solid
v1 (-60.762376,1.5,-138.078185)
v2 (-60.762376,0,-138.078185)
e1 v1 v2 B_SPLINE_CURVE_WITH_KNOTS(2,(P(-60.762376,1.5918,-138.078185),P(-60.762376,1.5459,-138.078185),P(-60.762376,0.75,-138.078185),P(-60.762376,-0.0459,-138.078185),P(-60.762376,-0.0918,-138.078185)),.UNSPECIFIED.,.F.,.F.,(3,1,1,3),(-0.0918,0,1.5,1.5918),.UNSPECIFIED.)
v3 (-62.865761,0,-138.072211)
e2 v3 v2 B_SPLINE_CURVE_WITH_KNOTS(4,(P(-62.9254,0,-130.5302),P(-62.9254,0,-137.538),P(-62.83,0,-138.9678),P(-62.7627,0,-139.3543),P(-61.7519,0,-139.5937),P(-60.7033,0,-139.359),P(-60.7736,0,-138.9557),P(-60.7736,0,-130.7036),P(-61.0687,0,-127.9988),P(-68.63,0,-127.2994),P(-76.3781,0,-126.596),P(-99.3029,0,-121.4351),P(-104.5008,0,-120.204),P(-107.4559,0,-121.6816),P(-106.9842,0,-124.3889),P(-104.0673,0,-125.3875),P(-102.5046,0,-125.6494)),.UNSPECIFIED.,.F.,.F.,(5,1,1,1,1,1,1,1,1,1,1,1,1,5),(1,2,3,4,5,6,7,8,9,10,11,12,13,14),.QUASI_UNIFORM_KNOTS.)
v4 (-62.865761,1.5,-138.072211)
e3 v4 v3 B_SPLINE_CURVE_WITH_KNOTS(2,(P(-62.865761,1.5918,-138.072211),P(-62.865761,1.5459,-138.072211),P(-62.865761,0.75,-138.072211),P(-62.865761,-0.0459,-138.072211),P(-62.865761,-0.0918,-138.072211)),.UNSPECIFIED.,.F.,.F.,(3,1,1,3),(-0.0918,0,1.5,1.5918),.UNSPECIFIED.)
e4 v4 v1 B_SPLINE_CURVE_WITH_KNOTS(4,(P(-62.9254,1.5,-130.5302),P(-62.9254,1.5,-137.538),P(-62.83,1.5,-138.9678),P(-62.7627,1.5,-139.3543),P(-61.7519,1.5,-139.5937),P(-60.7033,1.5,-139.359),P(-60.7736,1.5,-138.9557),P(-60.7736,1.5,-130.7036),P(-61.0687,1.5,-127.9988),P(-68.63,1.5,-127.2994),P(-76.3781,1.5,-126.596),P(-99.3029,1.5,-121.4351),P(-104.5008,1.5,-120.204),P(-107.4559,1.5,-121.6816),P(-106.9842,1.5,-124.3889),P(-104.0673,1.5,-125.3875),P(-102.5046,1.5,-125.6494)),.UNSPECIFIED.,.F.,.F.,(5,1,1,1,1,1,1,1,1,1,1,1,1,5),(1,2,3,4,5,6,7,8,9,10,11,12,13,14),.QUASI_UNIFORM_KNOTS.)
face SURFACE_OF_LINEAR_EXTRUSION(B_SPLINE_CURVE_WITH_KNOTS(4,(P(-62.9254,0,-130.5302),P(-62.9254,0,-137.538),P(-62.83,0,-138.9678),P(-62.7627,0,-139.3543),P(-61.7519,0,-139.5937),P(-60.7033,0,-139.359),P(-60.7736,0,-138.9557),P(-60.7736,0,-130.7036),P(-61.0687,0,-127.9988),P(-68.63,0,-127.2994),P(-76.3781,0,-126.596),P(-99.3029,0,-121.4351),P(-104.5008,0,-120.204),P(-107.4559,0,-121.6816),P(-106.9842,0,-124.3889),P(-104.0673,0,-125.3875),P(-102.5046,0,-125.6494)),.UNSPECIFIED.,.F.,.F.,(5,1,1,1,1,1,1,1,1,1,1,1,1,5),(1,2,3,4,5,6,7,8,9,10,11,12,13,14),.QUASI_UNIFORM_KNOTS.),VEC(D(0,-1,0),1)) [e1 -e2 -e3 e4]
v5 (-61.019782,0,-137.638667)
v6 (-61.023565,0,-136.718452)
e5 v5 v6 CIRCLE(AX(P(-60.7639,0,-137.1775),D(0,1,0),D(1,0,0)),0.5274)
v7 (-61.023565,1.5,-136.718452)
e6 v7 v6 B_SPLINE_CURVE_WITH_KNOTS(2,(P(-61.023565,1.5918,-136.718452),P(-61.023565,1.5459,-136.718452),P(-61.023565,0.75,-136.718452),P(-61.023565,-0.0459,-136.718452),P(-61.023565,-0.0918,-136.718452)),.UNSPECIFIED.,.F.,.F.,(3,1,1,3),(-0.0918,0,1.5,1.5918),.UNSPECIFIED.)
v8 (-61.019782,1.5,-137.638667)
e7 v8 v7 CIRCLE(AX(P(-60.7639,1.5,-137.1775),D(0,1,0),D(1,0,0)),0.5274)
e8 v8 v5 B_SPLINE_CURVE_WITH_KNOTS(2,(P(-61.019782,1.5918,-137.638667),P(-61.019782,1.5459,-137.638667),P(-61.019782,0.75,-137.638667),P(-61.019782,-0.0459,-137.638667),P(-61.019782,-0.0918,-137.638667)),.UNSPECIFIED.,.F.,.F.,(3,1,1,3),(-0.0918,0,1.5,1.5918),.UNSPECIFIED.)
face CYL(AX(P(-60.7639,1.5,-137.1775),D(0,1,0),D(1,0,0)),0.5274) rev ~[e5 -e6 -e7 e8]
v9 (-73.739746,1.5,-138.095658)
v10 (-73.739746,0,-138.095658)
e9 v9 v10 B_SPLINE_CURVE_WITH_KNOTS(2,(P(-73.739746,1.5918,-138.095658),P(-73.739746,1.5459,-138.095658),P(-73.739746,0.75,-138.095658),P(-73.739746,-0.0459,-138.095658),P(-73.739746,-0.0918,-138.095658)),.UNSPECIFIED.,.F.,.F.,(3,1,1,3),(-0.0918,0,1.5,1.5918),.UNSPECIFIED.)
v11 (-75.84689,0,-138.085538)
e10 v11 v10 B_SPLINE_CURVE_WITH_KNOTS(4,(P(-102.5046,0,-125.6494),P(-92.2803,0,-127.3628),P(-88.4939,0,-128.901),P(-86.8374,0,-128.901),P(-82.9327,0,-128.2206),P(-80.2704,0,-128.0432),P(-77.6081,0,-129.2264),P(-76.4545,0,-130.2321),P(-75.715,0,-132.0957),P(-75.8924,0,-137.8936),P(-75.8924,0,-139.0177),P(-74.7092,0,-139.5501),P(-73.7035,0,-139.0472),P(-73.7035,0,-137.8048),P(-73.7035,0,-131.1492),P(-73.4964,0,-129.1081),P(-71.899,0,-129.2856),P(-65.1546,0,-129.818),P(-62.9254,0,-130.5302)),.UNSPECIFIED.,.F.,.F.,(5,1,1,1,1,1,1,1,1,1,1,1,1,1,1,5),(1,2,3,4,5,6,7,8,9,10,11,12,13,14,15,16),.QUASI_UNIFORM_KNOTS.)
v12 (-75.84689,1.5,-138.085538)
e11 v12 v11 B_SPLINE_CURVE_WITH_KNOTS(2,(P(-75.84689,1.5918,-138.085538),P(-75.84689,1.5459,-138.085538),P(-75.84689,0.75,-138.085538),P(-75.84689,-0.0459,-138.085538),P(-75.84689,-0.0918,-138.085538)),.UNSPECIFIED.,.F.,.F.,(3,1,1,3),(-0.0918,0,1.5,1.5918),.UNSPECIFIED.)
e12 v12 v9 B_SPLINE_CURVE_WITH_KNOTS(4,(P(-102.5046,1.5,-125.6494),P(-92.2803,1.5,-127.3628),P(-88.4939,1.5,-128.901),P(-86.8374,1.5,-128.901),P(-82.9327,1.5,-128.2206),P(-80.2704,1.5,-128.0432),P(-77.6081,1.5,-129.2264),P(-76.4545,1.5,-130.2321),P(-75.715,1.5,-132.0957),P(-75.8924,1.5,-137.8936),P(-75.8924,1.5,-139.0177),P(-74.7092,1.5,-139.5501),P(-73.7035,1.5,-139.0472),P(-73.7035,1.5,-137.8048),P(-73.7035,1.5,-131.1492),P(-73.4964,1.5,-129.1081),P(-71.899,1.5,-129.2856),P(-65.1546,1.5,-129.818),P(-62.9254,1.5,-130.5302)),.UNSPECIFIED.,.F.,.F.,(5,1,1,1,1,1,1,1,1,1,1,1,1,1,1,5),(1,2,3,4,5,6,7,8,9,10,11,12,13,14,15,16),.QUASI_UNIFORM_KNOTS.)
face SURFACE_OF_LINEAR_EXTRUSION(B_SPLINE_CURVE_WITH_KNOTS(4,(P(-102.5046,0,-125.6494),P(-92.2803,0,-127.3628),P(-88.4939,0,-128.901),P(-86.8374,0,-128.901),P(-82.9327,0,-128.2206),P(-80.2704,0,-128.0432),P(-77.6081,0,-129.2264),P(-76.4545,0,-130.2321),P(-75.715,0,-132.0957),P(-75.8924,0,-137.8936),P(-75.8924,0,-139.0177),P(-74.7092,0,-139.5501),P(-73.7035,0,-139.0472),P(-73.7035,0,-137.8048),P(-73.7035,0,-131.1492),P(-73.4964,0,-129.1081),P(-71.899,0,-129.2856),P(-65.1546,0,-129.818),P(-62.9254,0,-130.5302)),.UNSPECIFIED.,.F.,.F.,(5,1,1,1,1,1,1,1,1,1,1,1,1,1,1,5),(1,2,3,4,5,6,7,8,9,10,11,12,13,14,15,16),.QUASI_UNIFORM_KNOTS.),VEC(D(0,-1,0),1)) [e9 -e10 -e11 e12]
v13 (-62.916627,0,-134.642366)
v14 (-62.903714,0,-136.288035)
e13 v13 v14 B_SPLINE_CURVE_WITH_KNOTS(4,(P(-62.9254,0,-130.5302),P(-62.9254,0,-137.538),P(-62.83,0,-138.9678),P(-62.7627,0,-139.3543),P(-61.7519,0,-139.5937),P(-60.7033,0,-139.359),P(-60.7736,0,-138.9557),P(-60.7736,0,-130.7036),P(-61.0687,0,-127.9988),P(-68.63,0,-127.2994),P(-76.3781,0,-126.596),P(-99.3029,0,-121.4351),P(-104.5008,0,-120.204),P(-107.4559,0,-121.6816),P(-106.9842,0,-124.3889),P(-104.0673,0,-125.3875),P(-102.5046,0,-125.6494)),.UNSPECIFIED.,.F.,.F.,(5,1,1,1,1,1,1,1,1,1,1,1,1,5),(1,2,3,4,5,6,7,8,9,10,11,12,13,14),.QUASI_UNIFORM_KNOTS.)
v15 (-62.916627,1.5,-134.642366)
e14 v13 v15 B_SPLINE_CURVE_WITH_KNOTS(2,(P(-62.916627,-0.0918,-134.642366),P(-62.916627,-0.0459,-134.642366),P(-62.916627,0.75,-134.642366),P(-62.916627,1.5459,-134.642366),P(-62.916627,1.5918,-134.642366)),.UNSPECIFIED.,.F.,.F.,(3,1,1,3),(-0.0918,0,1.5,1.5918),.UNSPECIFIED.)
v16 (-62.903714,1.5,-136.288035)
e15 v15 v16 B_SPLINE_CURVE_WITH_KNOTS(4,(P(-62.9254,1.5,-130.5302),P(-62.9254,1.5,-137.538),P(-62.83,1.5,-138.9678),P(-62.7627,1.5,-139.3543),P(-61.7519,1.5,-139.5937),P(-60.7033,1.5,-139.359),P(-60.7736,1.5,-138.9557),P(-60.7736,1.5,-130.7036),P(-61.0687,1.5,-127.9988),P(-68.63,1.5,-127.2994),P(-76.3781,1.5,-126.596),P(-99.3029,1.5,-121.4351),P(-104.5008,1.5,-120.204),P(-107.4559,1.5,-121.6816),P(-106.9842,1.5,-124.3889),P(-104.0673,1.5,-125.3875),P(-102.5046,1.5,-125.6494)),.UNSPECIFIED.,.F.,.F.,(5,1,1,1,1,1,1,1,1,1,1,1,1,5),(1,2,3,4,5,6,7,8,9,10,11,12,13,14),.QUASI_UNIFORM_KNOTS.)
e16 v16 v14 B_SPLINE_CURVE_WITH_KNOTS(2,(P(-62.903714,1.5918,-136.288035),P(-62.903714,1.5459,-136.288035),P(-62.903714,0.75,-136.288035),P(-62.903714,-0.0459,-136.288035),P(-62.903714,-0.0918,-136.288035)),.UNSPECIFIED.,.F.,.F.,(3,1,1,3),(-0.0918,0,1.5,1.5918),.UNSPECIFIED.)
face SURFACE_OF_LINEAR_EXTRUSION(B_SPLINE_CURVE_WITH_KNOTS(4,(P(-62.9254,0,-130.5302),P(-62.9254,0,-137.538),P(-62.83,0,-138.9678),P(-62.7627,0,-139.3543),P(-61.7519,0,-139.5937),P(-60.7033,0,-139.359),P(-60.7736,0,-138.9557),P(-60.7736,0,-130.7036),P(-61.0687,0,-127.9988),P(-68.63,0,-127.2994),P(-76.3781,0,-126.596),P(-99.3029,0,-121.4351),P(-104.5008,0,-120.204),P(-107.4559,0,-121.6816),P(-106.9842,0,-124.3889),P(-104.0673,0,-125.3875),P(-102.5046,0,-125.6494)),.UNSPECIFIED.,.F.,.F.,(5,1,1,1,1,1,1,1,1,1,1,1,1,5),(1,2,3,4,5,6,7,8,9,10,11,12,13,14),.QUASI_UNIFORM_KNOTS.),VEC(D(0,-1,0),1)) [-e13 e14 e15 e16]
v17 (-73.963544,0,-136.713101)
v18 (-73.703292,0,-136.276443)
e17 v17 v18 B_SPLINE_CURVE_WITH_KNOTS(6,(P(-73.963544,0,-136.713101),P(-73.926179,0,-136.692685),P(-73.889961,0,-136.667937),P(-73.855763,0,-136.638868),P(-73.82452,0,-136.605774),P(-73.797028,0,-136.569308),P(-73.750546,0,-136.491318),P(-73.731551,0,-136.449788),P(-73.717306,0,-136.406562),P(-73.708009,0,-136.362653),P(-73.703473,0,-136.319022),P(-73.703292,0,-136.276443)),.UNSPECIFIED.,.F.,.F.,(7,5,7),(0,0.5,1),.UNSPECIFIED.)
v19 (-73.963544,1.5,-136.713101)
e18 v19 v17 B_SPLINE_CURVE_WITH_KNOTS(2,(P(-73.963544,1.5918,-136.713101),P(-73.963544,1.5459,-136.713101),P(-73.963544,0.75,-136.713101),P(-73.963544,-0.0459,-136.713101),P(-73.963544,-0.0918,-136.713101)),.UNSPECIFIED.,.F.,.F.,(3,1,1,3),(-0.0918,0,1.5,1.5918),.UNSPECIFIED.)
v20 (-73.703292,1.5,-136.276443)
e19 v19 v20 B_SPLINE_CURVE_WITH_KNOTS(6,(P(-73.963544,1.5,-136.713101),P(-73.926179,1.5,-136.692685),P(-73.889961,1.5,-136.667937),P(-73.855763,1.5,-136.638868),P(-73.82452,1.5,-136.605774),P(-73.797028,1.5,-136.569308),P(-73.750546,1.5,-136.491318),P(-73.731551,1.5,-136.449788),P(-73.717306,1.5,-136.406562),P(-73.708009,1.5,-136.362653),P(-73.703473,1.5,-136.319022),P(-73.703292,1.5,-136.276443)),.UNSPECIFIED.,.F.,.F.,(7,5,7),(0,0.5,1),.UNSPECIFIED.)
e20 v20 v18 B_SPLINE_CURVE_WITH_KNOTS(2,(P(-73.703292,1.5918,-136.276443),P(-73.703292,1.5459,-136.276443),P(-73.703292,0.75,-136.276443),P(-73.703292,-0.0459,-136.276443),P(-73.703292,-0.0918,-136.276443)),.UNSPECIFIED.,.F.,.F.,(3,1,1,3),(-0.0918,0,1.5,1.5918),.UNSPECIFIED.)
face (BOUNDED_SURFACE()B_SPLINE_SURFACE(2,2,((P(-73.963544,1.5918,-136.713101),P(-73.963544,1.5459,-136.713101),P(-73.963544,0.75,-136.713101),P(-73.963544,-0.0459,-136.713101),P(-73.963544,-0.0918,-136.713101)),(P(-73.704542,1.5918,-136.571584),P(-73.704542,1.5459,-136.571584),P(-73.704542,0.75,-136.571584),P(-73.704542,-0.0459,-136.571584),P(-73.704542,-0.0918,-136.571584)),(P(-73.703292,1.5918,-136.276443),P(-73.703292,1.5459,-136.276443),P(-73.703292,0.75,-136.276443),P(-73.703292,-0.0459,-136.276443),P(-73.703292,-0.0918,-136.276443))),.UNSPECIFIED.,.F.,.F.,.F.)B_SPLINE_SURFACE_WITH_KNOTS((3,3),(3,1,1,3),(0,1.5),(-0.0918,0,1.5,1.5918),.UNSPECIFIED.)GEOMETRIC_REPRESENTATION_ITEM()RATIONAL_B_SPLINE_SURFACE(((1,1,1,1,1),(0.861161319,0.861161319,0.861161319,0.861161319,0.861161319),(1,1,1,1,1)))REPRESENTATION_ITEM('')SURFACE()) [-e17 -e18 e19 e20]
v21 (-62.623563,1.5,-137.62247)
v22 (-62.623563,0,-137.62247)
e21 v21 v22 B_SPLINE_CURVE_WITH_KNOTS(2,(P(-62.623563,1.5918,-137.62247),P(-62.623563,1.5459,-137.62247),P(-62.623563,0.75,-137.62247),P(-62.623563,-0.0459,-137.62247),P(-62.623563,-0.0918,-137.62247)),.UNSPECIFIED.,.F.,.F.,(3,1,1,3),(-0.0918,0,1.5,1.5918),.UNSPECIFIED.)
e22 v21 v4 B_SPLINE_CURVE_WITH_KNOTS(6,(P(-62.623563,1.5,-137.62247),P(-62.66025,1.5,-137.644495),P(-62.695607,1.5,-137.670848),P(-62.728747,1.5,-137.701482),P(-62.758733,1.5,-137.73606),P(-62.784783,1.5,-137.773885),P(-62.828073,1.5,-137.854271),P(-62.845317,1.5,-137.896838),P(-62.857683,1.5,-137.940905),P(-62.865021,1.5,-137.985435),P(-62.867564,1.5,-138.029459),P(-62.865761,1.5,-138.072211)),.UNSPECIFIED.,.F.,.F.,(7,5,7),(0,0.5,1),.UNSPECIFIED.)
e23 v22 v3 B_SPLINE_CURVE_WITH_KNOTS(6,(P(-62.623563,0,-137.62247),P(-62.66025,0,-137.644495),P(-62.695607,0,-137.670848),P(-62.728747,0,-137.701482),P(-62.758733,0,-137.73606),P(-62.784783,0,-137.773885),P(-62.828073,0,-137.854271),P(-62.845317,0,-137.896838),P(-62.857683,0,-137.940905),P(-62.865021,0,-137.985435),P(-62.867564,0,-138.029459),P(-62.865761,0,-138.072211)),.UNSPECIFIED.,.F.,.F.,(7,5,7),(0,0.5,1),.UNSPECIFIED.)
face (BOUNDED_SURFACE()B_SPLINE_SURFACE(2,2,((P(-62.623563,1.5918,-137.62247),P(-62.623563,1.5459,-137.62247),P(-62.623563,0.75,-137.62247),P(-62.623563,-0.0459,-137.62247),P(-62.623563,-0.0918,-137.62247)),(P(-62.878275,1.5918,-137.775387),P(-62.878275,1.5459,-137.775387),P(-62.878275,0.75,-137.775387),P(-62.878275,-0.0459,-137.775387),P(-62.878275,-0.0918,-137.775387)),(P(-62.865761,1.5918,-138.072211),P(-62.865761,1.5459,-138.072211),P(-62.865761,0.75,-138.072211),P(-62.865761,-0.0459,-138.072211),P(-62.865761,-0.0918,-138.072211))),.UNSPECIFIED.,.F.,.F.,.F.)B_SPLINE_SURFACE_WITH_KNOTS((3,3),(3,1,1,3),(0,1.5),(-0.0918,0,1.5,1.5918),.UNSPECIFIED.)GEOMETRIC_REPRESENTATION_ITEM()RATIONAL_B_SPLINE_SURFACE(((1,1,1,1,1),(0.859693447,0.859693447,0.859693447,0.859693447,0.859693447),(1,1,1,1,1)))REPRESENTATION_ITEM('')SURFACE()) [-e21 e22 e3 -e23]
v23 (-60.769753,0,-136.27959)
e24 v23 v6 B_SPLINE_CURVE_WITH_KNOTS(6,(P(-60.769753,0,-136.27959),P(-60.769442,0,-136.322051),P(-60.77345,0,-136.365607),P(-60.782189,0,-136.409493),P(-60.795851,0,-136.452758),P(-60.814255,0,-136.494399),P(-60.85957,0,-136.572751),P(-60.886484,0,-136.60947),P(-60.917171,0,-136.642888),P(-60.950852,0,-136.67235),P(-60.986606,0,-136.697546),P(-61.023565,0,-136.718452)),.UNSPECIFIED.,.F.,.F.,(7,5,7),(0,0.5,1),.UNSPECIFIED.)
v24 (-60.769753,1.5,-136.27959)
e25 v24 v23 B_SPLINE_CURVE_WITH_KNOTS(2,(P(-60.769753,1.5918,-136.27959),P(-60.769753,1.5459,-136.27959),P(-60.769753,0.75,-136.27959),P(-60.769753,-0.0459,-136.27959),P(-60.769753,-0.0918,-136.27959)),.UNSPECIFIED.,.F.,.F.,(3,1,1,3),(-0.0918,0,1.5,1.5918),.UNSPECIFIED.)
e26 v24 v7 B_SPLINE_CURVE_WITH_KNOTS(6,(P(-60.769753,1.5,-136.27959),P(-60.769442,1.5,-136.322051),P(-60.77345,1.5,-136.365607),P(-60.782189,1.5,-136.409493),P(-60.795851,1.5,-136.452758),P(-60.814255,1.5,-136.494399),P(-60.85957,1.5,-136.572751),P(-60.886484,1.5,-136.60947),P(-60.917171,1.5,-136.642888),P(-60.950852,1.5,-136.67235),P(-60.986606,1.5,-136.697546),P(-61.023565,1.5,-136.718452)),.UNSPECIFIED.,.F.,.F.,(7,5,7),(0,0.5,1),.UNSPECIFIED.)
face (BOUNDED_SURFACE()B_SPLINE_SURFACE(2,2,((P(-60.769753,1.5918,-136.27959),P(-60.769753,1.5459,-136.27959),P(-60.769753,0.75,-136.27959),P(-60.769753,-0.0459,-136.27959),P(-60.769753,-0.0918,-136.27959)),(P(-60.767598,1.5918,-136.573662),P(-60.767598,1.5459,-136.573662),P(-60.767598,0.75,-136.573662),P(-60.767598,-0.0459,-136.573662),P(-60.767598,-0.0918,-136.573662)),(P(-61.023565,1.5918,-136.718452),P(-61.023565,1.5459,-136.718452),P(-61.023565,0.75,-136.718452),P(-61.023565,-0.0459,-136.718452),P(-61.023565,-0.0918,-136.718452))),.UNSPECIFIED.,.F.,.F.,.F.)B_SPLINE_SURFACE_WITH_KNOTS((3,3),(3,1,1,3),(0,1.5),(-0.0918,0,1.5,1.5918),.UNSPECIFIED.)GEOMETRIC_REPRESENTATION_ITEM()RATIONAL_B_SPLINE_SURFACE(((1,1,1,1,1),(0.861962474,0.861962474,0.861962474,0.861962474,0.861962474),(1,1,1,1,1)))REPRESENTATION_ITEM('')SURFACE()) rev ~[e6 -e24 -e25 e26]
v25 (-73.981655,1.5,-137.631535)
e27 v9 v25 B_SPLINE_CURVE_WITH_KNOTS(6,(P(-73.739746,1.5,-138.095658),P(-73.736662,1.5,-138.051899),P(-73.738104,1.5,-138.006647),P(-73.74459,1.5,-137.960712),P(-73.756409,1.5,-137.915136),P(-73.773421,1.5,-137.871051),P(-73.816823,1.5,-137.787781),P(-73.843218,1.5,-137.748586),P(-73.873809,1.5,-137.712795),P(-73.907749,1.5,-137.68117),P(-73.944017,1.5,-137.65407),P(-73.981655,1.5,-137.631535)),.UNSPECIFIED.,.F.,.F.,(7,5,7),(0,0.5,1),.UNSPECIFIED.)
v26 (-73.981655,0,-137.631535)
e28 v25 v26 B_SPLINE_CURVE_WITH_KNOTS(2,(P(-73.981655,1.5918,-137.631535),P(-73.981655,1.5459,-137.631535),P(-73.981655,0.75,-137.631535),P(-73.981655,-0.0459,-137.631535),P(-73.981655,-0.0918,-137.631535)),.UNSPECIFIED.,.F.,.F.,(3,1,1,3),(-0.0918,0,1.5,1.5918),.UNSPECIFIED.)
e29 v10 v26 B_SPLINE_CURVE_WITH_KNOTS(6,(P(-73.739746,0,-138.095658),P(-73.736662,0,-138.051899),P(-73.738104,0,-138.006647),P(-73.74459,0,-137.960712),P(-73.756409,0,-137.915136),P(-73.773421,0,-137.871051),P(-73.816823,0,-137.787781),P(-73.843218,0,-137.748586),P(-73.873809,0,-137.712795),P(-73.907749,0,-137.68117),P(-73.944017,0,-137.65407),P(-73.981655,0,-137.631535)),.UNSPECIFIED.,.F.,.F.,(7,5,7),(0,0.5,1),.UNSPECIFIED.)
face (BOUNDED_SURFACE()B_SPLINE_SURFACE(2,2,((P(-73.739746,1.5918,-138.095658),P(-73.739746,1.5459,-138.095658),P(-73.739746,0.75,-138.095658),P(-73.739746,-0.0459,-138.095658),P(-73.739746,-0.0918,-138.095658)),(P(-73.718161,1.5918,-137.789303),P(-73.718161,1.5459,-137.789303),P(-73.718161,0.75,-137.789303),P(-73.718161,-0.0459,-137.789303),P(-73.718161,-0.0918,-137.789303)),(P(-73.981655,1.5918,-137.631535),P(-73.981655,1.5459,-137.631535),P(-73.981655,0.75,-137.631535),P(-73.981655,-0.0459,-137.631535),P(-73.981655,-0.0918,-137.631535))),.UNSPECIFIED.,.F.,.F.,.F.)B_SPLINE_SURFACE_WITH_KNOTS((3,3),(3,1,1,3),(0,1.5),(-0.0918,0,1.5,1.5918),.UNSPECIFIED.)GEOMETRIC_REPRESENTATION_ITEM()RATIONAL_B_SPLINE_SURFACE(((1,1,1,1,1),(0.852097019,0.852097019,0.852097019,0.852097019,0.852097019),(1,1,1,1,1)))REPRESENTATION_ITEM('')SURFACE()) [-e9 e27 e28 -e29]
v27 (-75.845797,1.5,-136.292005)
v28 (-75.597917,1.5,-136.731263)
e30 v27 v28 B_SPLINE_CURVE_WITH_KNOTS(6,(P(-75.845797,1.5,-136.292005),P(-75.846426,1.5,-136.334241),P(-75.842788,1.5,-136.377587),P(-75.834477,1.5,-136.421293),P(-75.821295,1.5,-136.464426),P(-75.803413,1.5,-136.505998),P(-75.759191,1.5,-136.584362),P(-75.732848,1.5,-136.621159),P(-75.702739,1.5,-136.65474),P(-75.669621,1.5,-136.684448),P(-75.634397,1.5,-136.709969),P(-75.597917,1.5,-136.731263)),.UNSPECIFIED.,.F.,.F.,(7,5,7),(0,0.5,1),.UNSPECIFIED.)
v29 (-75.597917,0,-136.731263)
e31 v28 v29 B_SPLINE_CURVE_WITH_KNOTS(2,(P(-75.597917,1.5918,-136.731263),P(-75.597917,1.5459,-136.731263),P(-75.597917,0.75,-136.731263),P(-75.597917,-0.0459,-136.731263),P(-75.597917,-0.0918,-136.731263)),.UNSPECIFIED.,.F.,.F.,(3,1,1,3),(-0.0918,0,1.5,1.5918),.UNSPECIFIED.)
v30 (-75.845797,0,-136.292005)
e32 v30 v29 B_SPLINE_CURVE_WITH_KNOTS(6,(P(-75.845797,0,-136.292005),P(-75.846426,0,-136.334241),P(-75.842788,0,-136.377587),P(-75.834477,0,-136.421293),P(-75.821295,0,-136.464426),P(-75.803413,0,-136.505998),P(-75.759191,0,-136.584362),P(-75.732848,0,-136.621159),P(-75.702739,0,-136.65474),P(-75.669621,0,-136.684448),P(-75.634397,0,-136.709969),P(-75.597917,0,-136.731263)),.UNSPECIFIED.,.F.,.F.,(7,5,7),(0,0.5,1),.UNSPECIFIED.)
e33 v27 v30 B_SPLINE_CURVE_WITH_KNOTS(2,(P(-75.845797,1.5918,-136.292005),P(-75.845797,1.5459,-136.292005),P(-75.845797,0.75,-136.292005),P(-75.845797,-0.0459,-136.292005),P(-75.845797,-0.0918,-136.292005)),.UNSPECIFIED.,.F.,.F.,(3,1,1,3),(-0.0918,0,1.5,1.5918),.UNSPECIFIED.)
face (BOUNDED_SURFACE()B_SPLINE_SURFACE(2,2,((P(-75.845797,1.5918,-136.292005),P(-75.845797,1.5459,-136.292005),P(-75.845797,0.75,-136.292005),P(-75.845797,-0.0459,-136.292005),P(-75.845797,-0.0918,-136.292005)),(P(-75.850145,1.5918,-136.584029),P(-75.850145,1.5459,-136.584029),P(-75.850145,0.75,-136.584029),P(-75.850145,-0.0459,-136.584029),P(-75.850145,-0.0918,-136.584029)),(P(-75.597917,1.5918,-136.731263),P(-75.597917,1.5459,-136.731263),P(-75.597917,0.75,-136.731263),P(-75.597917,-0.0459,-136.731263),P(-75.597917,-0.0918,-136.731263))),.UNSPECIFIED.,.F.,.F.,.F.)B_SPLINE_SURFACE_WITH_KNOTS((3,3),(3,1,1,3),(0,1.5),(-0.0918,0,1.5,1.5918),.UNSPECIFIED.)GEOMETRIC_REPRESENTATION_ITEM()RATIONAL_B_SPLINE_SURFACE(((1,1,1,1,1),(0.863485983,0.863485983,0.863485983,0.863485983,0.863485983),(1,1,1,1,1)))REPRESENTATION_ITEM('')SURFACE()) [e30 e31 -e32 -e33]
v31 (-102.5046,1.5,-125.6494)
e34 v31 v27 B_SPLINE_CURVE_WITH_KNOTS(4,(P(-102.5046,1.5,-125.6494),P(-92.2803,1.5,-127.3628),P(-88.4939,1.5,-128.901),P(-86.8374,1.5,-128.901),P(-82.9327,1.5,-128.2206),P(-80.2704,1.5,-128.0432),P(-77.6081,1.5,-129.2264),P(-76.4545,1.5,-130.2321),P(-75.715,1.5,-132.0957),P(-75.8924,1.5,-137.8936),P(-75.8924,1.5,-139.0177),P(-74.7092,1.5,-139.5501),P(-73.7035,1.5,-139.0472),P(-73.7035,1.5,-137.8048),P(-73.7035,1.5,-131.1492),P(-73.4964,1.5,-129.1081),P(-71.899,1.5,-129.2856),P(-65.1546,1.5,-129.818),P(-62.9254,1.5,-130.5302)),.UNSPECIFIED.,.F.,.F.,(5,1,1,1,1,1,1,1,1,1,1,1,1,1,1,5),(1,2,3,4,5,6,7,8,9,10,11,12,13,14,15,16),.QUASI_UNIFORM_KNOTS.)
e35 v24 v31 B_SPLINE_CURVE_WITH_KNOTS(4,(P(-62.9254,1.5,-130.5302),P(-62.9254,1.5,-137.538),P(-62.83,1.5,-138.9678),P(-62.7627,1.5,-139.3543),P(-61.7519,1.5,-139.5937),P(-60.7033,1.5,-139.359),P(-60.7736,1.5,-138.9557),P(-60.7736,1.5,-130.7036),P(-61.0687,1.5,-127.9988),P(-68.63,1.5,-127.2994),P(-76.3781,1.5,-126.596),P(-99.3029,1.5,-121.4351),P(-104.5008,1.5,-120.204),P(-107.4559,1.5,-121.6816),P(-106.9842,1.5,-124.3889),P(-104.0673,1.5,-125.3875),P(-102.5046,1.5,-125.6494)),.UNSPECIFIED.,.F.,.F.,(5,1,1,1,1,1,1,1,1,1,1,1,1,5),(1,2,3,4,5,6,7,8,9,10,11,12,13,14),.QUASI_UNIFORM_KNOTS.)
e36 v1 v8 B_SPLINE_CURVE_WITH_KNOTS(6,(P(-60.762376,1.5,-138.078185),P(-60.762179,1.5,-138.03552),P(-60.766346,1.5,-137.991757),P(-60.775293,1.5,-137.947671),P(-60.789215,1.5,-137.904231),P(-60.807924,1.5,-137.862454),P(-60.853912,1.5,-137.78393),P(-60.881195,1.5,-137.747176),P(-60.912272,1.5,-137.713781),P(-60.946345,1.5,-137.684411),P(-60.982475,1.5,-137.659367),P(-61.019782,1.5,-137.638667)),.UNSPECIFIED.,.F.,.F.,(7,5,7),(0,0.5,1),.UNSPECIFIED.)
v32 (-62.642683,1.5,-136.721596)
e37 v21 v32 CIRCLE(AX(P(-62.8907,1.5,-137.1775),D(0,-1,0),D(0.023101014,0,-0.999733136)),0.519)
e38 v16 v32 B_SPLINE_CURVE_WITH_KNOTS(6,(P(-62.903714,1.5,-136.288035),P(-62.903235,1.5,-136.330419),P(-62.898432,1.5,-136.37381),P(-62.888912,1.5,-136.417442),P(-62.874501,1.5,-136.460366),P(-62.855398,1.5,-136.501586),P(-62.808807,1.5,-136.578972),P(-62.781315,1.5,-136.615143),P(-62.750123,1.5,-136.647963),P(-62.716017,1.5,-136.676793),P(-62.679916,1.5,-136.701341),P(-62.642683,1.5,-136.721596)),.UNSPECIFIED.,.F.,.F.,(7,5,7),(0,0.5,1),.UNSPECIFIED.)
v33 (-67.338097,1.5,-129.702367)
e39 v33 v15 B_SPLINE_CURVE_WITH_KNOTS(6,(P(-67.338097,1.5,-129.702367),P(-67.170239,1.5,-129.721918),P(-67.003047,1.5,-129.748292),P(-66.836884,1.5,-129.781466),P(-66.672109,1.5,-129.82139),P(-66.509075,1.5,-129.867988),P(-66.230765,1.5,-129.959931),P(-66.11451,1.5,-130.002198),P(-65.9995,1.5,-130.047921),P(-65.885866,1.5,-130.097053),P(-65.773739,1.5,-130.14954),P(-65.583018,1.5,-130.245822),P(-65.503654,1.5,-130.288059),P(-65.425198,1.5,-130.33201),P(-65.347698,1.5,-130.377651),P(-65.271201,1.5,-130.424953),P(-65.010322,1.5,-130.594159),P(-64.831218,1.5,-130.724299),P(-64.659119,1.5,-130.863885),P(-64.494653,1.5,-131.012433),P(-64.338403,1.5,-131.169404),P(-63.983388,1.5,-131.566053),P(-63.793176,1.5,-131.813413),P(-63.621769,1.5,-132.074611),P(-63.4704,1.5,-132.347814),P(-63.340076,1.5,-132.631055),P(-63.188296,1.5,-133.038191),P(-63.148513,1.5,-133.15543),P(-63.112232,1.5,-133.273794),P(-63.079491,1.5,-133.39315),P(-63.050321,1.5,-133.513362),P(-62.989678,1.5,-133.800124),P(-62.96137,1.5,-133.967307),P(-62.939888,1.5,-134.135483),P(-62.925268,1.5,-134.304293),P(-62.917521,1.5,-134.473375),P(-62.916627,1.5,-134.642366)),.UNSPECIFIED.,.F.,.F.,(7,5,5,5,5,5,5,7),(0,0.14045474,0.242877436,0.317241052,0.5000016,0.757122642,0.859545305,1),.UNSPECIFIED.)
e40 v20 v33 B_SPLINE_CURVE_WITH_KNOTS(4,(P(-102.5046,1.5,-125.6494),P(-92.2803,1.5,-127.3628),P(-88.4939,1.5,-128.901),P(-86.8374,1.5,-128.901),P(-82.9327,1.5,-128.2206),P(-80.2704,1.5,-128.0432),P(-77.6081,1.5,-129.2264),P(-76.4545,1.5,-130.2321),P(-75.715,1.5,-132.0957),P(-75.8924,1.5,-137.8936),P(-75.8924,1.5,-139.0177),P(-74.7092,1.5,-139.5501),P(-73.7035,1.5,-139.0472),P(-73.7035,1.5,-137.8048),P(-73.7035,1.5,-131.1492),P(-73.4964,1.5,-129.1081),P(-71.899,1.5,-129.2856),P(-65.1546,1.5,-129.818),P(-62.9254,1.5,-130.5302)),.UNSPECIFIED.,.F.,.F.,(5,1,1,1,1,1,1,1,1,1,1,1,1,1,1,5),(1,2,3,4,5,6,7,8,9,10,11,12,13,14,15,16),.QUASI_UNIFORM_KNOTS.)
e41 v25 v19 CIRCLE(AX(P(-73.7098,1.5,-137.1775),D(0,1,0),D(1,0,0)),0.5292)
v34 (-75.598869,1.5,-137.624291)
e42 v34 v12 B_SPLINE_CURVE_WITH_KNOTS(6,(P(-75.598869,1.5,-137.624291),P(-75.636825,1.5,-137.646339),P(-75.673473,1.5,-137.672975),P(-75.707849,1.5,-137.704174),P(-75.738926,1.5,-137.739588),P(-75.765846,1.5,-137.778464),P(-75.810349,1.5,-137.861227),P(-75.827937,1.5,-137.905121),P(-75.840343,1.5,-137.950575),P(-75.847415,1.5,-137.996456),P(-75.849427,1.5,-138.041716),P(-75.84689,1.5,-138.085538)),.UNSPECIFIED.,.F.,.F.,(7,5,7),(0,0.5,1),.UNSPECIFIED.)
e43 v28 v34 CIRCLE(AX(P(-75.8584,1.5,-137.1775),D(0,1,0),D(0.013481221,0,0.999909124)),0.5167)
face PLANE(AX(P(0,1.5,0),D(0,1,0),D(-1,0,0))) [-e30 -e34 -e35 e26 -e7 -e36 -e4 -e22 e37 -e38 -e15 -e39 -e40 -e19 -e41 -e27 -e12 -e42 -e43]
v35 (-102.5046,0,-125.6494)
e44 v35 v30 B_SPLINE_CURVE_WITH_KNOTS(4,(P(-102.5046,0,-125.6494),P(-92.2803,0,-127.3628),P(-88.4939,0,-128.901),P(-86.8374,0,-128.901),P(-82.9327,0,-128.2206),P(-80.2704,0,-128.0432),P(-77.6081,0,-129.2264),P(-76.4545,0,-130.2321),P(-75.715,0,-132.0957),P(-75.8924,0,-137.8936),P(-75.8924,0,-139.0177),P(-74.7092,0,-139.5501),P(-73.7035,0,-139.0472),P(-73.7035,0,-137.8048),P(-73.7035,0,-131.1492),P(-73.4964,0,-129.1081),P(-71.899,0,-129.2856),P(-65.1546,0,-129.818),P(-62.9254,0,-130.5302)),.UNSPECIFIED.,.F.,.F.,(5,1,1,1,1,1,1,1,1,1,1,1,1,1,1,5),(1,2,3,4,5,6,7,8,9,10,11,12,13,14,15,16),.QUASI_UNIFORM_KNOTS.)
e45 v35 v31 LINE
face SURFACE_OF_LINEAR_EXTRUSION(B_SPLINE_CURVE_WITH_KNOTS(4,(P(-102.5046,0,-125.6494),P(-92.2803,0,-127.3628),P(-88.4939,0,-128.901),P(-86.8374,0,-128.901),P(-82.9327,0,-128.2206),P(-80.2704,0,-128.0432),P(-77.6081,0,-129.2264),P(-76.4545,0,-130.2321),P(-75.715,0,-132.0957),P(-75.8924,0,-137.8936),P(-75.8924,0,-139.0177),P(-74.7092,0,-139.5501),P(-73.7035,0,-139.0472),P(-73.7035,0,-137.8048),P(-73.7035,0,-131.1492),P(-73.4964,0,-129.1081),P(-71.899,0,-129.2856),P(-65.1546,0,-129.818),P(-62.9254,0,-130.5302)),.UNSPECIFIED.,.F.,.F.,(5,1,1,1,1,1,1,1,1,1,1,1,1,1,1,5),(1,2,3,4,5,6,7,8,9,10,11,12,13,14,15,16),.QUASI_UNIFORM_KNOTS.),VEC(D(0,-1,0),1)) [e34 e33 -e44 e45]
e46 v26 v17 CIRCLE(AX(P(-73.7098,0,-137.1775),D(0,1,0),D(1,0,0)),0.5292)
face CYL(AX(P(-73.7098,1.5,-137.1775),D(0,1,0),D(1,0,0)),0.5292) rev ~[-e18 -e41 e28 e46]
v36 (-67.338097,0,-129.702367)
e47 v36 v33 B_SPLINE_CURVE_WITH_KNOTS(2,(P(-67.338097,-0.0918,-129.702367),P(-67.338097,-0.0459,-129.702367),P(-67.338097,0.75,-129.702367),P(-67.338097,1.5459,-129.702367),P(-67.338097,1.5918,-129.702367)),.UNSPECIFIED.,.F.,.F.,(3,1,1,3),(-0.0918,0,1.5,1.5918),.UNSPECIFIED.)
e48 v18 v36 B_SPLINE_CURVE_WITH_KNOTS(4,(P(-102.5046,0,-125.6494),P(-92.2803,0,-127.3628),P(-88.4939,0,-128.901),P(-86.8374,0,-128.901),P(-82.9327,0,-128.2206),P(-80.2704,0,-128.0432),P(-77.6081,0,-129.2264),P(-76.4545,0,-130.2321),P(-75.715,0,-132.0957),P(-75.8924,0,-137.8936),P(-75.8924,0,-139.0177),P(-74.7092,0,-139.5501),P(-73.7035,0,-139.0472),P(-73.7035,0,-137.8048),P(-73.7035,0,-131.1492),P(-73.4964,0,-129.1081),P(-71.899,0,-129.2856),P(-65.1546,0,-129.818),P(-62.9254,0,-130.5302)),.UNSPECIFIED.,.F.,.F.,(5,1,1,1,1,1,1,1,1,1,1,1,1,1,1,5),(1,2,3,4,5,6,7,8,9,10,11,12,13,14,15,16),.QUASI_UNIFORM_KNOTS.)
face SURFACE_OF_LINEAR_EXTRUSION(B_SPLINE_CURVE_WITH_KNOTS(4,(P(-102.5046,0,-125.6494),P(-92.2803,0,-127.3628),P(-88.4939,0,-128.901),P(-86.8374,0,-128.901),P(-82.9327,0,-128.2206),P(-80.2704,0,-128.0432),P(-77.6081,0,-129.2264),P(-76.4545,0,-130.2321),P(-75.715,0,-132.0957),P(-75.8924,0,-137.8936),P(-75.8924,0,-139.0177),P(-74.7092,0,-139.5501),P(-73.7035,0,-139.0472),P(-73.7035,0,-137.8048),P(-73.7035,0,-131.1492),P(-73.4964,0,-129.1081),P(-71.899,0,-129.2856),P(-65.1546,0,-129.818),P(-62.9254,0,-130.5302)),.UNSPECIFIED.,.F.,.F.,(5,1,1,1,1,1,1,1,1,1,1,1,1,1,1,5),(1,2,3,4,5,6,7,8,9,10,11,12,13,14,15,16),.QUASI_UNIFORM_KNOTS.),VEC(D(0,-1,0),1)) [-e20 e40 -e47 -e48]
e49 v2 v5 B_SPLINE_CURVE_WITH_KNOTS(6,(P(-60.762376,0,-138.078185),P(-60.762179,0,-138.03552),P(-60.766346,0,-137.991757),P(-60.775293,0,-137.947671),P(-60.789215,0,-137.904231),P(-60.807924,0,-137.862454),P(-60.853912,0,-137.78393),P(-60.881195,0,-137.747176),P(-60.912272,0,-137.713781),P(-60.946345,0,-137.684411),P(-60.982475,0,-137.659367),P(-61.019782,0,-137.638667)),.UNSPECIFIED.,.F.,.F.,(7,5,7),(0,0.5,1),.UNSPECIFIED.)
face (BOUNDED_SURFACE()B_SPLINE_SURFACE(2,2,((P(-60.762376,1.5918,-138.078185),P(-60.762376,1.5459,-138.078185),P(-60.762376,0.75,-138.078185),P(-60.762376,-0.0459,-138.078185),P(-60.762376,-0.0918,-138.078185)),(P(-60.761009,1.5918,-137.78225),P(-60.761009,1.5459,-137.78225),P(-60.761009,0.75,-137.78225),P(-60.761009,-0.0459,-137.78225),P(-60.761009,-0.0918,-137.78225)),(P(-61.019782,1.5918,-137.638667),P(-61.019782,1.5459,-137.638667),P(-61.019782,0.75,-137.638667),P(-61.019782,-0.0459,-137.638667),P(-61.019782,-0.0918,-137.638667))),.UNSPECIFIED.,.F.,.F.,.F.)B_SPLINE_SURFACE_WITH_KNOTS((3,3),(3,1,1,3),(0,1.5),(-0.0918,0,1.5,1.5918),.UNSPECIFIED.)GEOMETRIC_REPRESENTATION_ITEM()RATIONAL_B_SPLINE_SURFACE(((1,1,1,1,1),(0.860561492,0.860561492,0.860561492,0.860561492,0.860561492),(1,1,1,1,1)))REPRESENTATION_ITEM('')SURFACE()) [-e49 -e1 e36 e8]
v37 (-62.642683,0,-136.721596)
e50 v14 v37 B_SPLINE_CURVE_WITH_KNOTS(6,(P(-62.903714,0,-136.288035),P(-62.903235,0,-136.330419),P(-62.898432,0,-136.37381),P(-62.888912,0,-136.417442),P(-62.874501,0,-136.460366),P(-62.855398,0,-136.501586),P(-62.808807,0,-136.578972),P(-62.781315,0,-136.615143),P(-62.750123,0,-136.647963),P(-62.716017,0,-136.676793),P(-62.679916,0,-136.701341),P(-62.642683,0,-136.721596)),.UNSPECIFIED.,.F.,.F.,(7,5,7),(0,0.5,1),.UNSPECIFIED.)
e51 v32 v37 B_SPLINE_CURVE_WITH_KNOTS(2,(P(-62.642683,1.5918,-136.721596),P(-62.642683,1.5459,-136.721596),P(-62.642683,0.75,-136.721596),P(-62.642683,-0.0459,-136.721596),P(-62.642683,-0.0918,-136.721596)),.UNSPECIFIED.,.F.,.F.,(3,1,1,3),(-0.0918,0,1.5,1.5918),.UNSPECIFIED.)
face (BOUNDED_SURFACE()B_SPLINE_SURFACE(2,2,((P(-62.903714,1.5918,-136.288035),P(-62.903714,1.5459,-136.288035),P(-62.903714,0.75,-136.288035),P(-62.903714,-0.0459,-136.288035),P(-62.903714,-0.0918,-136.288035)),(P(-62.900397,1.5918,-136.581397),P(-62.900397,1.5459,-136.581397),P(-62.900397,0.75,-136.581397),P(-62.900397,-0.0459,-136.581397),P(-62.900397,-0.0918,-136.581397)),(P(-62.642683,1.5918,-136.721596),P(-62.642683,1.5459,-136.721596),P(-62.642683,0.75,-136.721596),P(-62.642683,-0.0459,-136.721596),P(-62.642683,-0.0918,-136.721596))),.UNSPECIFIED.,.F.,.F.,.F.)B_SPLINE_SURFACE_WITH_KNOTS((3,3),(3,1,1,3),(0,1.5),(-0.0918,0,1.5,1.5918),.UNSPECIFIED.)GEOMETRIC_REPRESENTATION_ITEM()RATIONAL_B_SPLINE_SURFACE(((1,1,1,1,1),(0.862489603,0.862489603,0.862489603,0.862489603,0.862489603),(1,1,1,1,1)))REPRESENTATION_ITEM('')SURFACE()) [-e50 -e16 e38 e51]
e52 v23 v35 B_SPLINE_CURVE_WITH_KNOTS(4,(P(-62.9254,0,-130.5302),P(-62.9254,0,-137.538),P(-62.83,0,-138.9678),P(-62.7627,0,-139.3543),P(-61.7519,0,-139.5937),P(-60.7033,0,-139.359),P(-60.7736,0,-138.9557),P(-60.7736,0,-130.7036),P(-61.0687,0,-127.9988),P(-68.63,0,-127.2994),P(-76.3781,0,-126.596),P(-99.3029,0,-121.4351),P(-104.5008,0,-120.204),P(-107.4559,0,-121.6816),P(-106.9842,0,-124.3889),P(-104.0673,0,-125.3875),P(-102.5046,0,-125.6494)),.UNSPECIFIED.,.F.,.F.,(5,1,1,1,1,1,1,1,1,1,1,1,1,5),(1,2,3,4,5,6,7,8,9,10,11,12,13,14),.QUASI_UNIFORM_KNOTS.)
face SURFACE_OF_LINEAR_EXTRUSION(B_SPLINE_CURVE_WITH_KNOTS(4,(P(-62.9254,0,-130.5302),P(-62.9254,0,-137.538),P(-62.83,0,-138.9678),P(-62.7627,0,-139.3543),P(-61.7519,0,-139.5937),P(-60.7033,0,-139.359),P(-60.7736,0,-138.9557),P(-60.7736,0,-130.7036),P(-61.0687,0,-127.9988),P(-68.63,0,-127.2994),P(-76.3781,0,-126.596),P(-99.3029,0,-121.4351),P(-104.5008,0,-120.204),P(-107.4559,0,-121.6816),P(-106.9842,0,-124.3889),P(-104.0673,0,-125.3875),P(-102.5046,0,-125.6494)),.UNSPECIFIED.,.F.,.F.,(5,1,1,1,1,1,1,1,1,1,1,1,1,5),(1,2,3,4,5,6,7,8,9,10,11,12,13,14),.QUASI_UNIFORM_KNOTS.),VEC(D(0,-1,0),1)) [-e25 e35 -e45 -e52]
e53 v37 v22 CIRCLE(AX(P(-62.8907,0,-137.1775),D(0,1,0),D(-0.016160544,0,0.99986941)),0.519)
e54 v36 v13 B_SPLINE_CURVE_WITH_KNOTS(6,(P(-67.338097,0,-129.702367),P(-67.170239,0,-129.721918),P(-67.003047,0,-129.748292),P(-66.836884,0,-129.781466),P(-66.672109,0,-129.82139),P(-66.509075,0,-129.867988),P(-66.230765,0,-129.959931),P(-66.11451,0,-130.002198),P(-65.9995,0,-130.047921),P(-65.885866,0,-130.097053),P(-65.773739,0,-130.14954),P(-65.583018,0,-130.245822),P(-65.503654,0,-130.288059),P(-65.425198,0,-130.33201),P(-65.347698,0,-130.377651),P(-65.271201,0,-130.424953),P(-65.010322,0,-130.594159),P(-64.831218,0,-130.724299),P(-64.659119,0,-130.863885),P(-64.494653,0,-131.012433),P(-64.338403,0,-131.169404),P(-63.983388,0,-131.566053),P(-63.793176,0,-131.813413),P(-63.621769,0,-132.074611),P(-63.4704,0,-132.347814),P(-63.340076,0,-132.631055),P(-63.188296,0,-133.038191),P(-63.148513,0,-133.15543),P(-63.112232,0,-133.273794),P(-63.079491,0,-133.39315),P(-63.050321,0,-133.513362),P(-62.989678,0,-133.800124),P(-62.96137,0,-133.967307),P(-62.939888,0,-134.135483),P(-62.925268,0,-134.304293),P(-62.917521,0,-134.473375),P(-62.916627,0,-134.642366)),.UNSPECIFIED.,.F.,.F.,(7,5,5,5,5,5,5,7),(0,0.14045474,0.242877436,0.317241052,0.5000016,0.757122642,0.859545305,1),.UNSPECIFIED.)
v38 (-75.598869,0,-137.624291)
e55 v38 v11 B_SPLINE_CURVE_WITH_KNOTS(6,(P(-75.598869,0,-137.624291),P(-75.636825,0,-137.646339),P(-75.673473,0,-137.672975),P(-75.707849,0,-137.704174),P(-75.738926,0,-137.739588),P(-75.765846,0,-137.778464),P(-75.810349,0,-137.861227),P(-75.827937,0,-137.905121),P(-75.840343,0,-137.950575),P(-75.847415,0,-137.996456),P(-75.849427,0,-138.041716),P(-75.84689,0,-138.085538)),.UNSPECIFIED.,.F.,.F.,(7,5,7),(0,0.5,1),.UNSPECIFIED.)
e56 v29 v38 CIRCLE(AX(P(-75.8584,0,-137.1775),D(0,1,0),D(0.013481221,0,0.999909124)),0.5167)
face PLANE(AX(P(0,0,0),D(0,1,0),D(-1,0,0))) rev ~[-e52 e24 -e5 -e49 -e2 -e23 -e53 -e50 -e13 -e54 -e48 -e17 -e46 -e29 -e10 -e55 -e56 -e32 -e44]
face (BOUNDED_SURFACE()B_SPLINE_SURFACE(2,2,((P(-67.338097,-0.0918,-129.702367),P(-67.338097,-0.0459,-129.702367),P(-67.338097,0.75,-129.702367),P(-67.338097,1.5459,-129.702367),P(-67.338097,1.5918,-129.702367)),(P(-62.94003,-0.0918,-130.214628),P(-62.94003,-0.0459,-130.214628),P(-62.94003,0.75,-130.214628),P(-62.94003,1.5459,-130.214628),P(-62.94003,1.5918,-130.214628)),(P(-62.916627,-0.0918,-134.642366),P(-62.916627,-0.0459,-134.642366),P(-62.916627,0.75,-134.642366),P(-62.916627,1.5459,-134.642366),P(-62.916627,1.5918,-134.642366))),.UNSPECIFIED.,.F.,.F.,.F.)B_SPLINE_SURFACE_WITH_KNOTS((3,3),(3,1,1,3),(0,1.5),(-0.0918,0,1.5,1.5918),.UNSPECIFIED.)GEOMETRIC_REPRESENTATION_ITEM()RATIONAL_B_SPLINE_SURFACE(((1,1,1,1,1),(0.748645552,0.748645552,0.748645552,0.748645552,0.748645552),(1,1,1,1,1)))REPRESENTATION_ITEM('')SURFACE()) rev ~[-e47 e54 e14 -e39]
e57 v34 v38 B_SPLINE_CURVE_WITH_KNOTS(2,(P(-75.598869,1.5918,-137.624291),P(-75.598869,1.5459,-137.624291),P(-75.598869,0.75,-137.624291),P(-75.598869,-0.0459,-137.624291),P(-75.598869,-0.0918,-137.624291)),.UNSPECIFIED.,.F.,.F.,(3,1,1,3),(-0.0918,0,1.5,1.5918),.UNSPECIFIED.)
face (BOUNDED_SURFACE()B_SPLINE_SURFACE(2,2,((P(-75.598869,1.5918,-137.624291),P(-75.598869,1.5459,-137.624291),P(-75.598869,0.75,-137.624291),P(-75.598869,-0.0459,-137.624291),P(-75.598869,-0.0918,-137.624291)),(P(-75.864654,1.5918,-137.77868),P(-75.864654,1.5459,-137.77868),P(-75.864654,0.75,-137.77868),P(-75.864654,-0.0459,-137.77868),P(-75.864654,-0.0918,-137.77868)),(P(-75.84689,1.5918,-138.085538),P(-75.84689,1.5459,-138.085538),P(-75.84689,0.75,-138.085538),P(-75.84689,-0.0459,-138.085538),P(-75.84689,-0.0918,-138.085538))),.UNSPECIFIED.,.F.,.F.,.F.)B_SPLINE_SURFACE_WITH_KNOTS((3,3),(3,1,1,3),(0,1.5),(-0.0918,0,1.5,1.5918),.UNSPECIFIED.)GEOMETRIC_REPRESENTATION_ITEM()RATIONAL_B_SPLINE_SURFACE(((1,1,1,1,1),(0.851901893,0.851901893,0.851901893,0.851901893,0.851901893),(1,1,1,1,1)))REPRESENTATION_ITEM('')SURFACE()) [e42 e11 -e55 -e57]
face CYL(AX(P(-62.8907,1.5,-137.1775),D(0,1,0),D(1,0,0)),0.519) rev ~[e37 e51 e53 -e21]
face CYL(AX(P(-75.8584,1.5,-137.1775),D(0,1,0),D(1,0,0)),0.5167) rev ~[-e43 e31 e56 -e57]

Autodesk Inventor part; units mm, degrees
ref_plane "YZ Plane" through (0, 0, 0) normal (1, 0, 0) x (0, 1, 0)
ref_plane "XZ Plane" through (0, 0, 0) normal (0, 1, 0) x (-1, 0, 0)
ref_plane "XY Plane" through (0, 0, 0) normal (0, 0, 1) x (1, 0, 0)
sketch "Sketch1" plane through (0, 0, 0) normal (0, 1, 0) x (-1, 0, 0)
  line L0 (0, 0) -> (228.0708, 0) construction
  line L1 (228.0708, 0) -> (228.0708, -146.5792) construction
  line L2 (228.0708, -146.5792) -> (0, -146.5792) construction
  line L3 (0, -146.5792) -> (0, 0) construction
  line L4 (102.5046, -125.6494) -> (92.2803, -127.3628) construction
  line L5 (92.2803, -127.3628) -> (88.4939, -128.901) construction
  line L6 (88.4939, -128.901) -> (86.8374, -128.901) construction
  line L7 (86.8374, -128.901) -> (82.9327, -128.2206) construction
  line L8 (82.9327, -128.2206) -> (80.2704, -128.0432) construction
  line L9 (80.2704, -128.0432) -> (77.6081, -129.2264) construction
  line L10 (77.6081, -129.2264) -> (76.4545, -130.2321) construction
  line L11 (76.4545, -130.2321) -> (75.715, -132.0957) construction
  line L12 (75.715, -132.0957) -> (75.8924, -137.8936) construction
  line L13 (75.8924, -137.8936) -> (75.8924, -139.0177) construction
  line L14 (75.8924, -139.0177) -> (74.7092, -139.5501) construction
  line L15 (74.7092, -139.5501) -> (73.7035, -139.0472) construction
  line L16 (73.7035, -139.0472) -> (73.7035, -137.8048) construction
  line L17 (73.7035, -137.8048) -> (73.7035, -131.1492) construction
  line L18 (73.7035, -131.1492) -> (73.4964, -129.1081) construction
  line L19 (73.4964, -129.1081) -> (71.899, -129.2856) construction
  line L20 (71.899, -129.2856) -> (65.1546, -129.818) construction
  line L21 (65.1546, -129.818) -> (62.9254, -130.5302) construction
  spline S0 degree 4 poles (102.5046, -125.6494) (92.2803, -127.3628) (88.4939, -128.901) (86.8374, -128.901) (82.9327, -128.2206) (80.2704, -128.0432) (77.6081, -129.2264) (76.4545, -130.2321) (75.715, -132.0957) (75.8924, -137.8936) (75.8924, -139.0177) (74.7092, -139.5501) (73.7035, -139.0472) (73.7035, -137.8048) (73.7035, -131.1492) (73.4964, -129.1081) (71.899, -129.2856) (65.1546, -129.818) (62.9254, -130.5302) knots 1 1 1 1 1 2 3 4 5 6 7 8 9 10 11 12 13 14 15 16 16 16 16 16
  line L22 (62.9254, -130.5302) -> (62.9254, -137.538) construction
  line L23 (62.9254, -137.538) -> (62.83, -138.9678) construction
  line L24 (62.83, -138.9678) -> (62.7627, -139.3543) construction
  line L25 (62.7627, -139.3543) -> (61.7519, -139.5937) construction
  line L26 (61.7519, -139.5937) -> (60.7033, -139.359) construction
  line L27 (60.7033, -139.359) -> (60.7736, -138.9557) construction
  line L28 (60.7736, -138.9557) -> (60.7736, -130.7036) construction
  line L29 (60.7736, -130.7036) -> (61.0687, -127.9988) construction
  line L30 (61.0687, -127.9988) -> (68.63, -127.2994) construction
  line L31 (68.63, -127.2994) -> (76.3781, -126.596) construction
  line L32 (76.3781, -126.596) -> (99.3029, -121.4351) construction
  line L33 (99.3029, -121.4351) -> (104.5008, -120.204) construction
  line L34 (104.5008, -120.204) -> (107.4559, -121.6816) construction
  line L35 (107.4559, -121.6816) -> (106.9842, -124.3889) construction
  line L36 (106.9842, -124.3889) -> (104.0673, -125.3875) construction
  line L37 (104.0673, -125.3875) -> (102.5046, -125.6494) construction
  spline S1 degree 4 poles (62.9254, -130.5302) (62.9254, -137.538) (62.83, -138.9678) (62.7627, -139.3543) (61.7519, -139.5937) (60.7033, -139.359) (60.7736, -138.9557) (60.7736, -130.7036) (61.0687, -127.9988) (68.63, -127.2994) (76.3781, -126.596) (99.3029, -121.4351) (104.5008, -120.204) (107.4559, -121.6816) (106.9842, -124.3889) (104.0673, -125.3875) (102.5046, -125.6494) knots 1 1 1 1 1 2 3 4 5 6 7 8 9 10 11 12 13 14 14 14 14 14
extrude "Extrusion1" add sketch "Sketch1" along normal blind 1.5
fillet "Fillet1" radius 5 1 edges at (-62.9254, 0.75, -130.5302)
sketch "Sketch2" plane through (0, 1.5, 0) normal (0, 1, 0) x (1, 0, 0)
  circle A0 centre (-75.8584, 137.1775) radius 0.5167
  circle A1 centre (-73.7098, 137.1775) radius 0.5292
  circle A2 centre (-62.8907, 137.1775) radius 0.519
  circle A3 centre (-60.7639, 137.1775) radius 0.5274
  point P0 (0, 0)
extrude "Extrusion2" cut sketch "Sketch2" against normal through all
fillet "Fillet2" radius 0.5 8 edges at (-73.7209, 0.75, -137.7066) (-73.7051, 0.75, -136.6483) (-75.8515, 0.75, -136.6609) (-75.859, 0.75, -137.6942) (-62.8991, 0.75, -136.6586) (-62.8787, 0.75, -137.6964) (-60.7671, 0.75, -136.6502) (-60.762, 0.75, -137.7049)
properties part number "toothpick"
